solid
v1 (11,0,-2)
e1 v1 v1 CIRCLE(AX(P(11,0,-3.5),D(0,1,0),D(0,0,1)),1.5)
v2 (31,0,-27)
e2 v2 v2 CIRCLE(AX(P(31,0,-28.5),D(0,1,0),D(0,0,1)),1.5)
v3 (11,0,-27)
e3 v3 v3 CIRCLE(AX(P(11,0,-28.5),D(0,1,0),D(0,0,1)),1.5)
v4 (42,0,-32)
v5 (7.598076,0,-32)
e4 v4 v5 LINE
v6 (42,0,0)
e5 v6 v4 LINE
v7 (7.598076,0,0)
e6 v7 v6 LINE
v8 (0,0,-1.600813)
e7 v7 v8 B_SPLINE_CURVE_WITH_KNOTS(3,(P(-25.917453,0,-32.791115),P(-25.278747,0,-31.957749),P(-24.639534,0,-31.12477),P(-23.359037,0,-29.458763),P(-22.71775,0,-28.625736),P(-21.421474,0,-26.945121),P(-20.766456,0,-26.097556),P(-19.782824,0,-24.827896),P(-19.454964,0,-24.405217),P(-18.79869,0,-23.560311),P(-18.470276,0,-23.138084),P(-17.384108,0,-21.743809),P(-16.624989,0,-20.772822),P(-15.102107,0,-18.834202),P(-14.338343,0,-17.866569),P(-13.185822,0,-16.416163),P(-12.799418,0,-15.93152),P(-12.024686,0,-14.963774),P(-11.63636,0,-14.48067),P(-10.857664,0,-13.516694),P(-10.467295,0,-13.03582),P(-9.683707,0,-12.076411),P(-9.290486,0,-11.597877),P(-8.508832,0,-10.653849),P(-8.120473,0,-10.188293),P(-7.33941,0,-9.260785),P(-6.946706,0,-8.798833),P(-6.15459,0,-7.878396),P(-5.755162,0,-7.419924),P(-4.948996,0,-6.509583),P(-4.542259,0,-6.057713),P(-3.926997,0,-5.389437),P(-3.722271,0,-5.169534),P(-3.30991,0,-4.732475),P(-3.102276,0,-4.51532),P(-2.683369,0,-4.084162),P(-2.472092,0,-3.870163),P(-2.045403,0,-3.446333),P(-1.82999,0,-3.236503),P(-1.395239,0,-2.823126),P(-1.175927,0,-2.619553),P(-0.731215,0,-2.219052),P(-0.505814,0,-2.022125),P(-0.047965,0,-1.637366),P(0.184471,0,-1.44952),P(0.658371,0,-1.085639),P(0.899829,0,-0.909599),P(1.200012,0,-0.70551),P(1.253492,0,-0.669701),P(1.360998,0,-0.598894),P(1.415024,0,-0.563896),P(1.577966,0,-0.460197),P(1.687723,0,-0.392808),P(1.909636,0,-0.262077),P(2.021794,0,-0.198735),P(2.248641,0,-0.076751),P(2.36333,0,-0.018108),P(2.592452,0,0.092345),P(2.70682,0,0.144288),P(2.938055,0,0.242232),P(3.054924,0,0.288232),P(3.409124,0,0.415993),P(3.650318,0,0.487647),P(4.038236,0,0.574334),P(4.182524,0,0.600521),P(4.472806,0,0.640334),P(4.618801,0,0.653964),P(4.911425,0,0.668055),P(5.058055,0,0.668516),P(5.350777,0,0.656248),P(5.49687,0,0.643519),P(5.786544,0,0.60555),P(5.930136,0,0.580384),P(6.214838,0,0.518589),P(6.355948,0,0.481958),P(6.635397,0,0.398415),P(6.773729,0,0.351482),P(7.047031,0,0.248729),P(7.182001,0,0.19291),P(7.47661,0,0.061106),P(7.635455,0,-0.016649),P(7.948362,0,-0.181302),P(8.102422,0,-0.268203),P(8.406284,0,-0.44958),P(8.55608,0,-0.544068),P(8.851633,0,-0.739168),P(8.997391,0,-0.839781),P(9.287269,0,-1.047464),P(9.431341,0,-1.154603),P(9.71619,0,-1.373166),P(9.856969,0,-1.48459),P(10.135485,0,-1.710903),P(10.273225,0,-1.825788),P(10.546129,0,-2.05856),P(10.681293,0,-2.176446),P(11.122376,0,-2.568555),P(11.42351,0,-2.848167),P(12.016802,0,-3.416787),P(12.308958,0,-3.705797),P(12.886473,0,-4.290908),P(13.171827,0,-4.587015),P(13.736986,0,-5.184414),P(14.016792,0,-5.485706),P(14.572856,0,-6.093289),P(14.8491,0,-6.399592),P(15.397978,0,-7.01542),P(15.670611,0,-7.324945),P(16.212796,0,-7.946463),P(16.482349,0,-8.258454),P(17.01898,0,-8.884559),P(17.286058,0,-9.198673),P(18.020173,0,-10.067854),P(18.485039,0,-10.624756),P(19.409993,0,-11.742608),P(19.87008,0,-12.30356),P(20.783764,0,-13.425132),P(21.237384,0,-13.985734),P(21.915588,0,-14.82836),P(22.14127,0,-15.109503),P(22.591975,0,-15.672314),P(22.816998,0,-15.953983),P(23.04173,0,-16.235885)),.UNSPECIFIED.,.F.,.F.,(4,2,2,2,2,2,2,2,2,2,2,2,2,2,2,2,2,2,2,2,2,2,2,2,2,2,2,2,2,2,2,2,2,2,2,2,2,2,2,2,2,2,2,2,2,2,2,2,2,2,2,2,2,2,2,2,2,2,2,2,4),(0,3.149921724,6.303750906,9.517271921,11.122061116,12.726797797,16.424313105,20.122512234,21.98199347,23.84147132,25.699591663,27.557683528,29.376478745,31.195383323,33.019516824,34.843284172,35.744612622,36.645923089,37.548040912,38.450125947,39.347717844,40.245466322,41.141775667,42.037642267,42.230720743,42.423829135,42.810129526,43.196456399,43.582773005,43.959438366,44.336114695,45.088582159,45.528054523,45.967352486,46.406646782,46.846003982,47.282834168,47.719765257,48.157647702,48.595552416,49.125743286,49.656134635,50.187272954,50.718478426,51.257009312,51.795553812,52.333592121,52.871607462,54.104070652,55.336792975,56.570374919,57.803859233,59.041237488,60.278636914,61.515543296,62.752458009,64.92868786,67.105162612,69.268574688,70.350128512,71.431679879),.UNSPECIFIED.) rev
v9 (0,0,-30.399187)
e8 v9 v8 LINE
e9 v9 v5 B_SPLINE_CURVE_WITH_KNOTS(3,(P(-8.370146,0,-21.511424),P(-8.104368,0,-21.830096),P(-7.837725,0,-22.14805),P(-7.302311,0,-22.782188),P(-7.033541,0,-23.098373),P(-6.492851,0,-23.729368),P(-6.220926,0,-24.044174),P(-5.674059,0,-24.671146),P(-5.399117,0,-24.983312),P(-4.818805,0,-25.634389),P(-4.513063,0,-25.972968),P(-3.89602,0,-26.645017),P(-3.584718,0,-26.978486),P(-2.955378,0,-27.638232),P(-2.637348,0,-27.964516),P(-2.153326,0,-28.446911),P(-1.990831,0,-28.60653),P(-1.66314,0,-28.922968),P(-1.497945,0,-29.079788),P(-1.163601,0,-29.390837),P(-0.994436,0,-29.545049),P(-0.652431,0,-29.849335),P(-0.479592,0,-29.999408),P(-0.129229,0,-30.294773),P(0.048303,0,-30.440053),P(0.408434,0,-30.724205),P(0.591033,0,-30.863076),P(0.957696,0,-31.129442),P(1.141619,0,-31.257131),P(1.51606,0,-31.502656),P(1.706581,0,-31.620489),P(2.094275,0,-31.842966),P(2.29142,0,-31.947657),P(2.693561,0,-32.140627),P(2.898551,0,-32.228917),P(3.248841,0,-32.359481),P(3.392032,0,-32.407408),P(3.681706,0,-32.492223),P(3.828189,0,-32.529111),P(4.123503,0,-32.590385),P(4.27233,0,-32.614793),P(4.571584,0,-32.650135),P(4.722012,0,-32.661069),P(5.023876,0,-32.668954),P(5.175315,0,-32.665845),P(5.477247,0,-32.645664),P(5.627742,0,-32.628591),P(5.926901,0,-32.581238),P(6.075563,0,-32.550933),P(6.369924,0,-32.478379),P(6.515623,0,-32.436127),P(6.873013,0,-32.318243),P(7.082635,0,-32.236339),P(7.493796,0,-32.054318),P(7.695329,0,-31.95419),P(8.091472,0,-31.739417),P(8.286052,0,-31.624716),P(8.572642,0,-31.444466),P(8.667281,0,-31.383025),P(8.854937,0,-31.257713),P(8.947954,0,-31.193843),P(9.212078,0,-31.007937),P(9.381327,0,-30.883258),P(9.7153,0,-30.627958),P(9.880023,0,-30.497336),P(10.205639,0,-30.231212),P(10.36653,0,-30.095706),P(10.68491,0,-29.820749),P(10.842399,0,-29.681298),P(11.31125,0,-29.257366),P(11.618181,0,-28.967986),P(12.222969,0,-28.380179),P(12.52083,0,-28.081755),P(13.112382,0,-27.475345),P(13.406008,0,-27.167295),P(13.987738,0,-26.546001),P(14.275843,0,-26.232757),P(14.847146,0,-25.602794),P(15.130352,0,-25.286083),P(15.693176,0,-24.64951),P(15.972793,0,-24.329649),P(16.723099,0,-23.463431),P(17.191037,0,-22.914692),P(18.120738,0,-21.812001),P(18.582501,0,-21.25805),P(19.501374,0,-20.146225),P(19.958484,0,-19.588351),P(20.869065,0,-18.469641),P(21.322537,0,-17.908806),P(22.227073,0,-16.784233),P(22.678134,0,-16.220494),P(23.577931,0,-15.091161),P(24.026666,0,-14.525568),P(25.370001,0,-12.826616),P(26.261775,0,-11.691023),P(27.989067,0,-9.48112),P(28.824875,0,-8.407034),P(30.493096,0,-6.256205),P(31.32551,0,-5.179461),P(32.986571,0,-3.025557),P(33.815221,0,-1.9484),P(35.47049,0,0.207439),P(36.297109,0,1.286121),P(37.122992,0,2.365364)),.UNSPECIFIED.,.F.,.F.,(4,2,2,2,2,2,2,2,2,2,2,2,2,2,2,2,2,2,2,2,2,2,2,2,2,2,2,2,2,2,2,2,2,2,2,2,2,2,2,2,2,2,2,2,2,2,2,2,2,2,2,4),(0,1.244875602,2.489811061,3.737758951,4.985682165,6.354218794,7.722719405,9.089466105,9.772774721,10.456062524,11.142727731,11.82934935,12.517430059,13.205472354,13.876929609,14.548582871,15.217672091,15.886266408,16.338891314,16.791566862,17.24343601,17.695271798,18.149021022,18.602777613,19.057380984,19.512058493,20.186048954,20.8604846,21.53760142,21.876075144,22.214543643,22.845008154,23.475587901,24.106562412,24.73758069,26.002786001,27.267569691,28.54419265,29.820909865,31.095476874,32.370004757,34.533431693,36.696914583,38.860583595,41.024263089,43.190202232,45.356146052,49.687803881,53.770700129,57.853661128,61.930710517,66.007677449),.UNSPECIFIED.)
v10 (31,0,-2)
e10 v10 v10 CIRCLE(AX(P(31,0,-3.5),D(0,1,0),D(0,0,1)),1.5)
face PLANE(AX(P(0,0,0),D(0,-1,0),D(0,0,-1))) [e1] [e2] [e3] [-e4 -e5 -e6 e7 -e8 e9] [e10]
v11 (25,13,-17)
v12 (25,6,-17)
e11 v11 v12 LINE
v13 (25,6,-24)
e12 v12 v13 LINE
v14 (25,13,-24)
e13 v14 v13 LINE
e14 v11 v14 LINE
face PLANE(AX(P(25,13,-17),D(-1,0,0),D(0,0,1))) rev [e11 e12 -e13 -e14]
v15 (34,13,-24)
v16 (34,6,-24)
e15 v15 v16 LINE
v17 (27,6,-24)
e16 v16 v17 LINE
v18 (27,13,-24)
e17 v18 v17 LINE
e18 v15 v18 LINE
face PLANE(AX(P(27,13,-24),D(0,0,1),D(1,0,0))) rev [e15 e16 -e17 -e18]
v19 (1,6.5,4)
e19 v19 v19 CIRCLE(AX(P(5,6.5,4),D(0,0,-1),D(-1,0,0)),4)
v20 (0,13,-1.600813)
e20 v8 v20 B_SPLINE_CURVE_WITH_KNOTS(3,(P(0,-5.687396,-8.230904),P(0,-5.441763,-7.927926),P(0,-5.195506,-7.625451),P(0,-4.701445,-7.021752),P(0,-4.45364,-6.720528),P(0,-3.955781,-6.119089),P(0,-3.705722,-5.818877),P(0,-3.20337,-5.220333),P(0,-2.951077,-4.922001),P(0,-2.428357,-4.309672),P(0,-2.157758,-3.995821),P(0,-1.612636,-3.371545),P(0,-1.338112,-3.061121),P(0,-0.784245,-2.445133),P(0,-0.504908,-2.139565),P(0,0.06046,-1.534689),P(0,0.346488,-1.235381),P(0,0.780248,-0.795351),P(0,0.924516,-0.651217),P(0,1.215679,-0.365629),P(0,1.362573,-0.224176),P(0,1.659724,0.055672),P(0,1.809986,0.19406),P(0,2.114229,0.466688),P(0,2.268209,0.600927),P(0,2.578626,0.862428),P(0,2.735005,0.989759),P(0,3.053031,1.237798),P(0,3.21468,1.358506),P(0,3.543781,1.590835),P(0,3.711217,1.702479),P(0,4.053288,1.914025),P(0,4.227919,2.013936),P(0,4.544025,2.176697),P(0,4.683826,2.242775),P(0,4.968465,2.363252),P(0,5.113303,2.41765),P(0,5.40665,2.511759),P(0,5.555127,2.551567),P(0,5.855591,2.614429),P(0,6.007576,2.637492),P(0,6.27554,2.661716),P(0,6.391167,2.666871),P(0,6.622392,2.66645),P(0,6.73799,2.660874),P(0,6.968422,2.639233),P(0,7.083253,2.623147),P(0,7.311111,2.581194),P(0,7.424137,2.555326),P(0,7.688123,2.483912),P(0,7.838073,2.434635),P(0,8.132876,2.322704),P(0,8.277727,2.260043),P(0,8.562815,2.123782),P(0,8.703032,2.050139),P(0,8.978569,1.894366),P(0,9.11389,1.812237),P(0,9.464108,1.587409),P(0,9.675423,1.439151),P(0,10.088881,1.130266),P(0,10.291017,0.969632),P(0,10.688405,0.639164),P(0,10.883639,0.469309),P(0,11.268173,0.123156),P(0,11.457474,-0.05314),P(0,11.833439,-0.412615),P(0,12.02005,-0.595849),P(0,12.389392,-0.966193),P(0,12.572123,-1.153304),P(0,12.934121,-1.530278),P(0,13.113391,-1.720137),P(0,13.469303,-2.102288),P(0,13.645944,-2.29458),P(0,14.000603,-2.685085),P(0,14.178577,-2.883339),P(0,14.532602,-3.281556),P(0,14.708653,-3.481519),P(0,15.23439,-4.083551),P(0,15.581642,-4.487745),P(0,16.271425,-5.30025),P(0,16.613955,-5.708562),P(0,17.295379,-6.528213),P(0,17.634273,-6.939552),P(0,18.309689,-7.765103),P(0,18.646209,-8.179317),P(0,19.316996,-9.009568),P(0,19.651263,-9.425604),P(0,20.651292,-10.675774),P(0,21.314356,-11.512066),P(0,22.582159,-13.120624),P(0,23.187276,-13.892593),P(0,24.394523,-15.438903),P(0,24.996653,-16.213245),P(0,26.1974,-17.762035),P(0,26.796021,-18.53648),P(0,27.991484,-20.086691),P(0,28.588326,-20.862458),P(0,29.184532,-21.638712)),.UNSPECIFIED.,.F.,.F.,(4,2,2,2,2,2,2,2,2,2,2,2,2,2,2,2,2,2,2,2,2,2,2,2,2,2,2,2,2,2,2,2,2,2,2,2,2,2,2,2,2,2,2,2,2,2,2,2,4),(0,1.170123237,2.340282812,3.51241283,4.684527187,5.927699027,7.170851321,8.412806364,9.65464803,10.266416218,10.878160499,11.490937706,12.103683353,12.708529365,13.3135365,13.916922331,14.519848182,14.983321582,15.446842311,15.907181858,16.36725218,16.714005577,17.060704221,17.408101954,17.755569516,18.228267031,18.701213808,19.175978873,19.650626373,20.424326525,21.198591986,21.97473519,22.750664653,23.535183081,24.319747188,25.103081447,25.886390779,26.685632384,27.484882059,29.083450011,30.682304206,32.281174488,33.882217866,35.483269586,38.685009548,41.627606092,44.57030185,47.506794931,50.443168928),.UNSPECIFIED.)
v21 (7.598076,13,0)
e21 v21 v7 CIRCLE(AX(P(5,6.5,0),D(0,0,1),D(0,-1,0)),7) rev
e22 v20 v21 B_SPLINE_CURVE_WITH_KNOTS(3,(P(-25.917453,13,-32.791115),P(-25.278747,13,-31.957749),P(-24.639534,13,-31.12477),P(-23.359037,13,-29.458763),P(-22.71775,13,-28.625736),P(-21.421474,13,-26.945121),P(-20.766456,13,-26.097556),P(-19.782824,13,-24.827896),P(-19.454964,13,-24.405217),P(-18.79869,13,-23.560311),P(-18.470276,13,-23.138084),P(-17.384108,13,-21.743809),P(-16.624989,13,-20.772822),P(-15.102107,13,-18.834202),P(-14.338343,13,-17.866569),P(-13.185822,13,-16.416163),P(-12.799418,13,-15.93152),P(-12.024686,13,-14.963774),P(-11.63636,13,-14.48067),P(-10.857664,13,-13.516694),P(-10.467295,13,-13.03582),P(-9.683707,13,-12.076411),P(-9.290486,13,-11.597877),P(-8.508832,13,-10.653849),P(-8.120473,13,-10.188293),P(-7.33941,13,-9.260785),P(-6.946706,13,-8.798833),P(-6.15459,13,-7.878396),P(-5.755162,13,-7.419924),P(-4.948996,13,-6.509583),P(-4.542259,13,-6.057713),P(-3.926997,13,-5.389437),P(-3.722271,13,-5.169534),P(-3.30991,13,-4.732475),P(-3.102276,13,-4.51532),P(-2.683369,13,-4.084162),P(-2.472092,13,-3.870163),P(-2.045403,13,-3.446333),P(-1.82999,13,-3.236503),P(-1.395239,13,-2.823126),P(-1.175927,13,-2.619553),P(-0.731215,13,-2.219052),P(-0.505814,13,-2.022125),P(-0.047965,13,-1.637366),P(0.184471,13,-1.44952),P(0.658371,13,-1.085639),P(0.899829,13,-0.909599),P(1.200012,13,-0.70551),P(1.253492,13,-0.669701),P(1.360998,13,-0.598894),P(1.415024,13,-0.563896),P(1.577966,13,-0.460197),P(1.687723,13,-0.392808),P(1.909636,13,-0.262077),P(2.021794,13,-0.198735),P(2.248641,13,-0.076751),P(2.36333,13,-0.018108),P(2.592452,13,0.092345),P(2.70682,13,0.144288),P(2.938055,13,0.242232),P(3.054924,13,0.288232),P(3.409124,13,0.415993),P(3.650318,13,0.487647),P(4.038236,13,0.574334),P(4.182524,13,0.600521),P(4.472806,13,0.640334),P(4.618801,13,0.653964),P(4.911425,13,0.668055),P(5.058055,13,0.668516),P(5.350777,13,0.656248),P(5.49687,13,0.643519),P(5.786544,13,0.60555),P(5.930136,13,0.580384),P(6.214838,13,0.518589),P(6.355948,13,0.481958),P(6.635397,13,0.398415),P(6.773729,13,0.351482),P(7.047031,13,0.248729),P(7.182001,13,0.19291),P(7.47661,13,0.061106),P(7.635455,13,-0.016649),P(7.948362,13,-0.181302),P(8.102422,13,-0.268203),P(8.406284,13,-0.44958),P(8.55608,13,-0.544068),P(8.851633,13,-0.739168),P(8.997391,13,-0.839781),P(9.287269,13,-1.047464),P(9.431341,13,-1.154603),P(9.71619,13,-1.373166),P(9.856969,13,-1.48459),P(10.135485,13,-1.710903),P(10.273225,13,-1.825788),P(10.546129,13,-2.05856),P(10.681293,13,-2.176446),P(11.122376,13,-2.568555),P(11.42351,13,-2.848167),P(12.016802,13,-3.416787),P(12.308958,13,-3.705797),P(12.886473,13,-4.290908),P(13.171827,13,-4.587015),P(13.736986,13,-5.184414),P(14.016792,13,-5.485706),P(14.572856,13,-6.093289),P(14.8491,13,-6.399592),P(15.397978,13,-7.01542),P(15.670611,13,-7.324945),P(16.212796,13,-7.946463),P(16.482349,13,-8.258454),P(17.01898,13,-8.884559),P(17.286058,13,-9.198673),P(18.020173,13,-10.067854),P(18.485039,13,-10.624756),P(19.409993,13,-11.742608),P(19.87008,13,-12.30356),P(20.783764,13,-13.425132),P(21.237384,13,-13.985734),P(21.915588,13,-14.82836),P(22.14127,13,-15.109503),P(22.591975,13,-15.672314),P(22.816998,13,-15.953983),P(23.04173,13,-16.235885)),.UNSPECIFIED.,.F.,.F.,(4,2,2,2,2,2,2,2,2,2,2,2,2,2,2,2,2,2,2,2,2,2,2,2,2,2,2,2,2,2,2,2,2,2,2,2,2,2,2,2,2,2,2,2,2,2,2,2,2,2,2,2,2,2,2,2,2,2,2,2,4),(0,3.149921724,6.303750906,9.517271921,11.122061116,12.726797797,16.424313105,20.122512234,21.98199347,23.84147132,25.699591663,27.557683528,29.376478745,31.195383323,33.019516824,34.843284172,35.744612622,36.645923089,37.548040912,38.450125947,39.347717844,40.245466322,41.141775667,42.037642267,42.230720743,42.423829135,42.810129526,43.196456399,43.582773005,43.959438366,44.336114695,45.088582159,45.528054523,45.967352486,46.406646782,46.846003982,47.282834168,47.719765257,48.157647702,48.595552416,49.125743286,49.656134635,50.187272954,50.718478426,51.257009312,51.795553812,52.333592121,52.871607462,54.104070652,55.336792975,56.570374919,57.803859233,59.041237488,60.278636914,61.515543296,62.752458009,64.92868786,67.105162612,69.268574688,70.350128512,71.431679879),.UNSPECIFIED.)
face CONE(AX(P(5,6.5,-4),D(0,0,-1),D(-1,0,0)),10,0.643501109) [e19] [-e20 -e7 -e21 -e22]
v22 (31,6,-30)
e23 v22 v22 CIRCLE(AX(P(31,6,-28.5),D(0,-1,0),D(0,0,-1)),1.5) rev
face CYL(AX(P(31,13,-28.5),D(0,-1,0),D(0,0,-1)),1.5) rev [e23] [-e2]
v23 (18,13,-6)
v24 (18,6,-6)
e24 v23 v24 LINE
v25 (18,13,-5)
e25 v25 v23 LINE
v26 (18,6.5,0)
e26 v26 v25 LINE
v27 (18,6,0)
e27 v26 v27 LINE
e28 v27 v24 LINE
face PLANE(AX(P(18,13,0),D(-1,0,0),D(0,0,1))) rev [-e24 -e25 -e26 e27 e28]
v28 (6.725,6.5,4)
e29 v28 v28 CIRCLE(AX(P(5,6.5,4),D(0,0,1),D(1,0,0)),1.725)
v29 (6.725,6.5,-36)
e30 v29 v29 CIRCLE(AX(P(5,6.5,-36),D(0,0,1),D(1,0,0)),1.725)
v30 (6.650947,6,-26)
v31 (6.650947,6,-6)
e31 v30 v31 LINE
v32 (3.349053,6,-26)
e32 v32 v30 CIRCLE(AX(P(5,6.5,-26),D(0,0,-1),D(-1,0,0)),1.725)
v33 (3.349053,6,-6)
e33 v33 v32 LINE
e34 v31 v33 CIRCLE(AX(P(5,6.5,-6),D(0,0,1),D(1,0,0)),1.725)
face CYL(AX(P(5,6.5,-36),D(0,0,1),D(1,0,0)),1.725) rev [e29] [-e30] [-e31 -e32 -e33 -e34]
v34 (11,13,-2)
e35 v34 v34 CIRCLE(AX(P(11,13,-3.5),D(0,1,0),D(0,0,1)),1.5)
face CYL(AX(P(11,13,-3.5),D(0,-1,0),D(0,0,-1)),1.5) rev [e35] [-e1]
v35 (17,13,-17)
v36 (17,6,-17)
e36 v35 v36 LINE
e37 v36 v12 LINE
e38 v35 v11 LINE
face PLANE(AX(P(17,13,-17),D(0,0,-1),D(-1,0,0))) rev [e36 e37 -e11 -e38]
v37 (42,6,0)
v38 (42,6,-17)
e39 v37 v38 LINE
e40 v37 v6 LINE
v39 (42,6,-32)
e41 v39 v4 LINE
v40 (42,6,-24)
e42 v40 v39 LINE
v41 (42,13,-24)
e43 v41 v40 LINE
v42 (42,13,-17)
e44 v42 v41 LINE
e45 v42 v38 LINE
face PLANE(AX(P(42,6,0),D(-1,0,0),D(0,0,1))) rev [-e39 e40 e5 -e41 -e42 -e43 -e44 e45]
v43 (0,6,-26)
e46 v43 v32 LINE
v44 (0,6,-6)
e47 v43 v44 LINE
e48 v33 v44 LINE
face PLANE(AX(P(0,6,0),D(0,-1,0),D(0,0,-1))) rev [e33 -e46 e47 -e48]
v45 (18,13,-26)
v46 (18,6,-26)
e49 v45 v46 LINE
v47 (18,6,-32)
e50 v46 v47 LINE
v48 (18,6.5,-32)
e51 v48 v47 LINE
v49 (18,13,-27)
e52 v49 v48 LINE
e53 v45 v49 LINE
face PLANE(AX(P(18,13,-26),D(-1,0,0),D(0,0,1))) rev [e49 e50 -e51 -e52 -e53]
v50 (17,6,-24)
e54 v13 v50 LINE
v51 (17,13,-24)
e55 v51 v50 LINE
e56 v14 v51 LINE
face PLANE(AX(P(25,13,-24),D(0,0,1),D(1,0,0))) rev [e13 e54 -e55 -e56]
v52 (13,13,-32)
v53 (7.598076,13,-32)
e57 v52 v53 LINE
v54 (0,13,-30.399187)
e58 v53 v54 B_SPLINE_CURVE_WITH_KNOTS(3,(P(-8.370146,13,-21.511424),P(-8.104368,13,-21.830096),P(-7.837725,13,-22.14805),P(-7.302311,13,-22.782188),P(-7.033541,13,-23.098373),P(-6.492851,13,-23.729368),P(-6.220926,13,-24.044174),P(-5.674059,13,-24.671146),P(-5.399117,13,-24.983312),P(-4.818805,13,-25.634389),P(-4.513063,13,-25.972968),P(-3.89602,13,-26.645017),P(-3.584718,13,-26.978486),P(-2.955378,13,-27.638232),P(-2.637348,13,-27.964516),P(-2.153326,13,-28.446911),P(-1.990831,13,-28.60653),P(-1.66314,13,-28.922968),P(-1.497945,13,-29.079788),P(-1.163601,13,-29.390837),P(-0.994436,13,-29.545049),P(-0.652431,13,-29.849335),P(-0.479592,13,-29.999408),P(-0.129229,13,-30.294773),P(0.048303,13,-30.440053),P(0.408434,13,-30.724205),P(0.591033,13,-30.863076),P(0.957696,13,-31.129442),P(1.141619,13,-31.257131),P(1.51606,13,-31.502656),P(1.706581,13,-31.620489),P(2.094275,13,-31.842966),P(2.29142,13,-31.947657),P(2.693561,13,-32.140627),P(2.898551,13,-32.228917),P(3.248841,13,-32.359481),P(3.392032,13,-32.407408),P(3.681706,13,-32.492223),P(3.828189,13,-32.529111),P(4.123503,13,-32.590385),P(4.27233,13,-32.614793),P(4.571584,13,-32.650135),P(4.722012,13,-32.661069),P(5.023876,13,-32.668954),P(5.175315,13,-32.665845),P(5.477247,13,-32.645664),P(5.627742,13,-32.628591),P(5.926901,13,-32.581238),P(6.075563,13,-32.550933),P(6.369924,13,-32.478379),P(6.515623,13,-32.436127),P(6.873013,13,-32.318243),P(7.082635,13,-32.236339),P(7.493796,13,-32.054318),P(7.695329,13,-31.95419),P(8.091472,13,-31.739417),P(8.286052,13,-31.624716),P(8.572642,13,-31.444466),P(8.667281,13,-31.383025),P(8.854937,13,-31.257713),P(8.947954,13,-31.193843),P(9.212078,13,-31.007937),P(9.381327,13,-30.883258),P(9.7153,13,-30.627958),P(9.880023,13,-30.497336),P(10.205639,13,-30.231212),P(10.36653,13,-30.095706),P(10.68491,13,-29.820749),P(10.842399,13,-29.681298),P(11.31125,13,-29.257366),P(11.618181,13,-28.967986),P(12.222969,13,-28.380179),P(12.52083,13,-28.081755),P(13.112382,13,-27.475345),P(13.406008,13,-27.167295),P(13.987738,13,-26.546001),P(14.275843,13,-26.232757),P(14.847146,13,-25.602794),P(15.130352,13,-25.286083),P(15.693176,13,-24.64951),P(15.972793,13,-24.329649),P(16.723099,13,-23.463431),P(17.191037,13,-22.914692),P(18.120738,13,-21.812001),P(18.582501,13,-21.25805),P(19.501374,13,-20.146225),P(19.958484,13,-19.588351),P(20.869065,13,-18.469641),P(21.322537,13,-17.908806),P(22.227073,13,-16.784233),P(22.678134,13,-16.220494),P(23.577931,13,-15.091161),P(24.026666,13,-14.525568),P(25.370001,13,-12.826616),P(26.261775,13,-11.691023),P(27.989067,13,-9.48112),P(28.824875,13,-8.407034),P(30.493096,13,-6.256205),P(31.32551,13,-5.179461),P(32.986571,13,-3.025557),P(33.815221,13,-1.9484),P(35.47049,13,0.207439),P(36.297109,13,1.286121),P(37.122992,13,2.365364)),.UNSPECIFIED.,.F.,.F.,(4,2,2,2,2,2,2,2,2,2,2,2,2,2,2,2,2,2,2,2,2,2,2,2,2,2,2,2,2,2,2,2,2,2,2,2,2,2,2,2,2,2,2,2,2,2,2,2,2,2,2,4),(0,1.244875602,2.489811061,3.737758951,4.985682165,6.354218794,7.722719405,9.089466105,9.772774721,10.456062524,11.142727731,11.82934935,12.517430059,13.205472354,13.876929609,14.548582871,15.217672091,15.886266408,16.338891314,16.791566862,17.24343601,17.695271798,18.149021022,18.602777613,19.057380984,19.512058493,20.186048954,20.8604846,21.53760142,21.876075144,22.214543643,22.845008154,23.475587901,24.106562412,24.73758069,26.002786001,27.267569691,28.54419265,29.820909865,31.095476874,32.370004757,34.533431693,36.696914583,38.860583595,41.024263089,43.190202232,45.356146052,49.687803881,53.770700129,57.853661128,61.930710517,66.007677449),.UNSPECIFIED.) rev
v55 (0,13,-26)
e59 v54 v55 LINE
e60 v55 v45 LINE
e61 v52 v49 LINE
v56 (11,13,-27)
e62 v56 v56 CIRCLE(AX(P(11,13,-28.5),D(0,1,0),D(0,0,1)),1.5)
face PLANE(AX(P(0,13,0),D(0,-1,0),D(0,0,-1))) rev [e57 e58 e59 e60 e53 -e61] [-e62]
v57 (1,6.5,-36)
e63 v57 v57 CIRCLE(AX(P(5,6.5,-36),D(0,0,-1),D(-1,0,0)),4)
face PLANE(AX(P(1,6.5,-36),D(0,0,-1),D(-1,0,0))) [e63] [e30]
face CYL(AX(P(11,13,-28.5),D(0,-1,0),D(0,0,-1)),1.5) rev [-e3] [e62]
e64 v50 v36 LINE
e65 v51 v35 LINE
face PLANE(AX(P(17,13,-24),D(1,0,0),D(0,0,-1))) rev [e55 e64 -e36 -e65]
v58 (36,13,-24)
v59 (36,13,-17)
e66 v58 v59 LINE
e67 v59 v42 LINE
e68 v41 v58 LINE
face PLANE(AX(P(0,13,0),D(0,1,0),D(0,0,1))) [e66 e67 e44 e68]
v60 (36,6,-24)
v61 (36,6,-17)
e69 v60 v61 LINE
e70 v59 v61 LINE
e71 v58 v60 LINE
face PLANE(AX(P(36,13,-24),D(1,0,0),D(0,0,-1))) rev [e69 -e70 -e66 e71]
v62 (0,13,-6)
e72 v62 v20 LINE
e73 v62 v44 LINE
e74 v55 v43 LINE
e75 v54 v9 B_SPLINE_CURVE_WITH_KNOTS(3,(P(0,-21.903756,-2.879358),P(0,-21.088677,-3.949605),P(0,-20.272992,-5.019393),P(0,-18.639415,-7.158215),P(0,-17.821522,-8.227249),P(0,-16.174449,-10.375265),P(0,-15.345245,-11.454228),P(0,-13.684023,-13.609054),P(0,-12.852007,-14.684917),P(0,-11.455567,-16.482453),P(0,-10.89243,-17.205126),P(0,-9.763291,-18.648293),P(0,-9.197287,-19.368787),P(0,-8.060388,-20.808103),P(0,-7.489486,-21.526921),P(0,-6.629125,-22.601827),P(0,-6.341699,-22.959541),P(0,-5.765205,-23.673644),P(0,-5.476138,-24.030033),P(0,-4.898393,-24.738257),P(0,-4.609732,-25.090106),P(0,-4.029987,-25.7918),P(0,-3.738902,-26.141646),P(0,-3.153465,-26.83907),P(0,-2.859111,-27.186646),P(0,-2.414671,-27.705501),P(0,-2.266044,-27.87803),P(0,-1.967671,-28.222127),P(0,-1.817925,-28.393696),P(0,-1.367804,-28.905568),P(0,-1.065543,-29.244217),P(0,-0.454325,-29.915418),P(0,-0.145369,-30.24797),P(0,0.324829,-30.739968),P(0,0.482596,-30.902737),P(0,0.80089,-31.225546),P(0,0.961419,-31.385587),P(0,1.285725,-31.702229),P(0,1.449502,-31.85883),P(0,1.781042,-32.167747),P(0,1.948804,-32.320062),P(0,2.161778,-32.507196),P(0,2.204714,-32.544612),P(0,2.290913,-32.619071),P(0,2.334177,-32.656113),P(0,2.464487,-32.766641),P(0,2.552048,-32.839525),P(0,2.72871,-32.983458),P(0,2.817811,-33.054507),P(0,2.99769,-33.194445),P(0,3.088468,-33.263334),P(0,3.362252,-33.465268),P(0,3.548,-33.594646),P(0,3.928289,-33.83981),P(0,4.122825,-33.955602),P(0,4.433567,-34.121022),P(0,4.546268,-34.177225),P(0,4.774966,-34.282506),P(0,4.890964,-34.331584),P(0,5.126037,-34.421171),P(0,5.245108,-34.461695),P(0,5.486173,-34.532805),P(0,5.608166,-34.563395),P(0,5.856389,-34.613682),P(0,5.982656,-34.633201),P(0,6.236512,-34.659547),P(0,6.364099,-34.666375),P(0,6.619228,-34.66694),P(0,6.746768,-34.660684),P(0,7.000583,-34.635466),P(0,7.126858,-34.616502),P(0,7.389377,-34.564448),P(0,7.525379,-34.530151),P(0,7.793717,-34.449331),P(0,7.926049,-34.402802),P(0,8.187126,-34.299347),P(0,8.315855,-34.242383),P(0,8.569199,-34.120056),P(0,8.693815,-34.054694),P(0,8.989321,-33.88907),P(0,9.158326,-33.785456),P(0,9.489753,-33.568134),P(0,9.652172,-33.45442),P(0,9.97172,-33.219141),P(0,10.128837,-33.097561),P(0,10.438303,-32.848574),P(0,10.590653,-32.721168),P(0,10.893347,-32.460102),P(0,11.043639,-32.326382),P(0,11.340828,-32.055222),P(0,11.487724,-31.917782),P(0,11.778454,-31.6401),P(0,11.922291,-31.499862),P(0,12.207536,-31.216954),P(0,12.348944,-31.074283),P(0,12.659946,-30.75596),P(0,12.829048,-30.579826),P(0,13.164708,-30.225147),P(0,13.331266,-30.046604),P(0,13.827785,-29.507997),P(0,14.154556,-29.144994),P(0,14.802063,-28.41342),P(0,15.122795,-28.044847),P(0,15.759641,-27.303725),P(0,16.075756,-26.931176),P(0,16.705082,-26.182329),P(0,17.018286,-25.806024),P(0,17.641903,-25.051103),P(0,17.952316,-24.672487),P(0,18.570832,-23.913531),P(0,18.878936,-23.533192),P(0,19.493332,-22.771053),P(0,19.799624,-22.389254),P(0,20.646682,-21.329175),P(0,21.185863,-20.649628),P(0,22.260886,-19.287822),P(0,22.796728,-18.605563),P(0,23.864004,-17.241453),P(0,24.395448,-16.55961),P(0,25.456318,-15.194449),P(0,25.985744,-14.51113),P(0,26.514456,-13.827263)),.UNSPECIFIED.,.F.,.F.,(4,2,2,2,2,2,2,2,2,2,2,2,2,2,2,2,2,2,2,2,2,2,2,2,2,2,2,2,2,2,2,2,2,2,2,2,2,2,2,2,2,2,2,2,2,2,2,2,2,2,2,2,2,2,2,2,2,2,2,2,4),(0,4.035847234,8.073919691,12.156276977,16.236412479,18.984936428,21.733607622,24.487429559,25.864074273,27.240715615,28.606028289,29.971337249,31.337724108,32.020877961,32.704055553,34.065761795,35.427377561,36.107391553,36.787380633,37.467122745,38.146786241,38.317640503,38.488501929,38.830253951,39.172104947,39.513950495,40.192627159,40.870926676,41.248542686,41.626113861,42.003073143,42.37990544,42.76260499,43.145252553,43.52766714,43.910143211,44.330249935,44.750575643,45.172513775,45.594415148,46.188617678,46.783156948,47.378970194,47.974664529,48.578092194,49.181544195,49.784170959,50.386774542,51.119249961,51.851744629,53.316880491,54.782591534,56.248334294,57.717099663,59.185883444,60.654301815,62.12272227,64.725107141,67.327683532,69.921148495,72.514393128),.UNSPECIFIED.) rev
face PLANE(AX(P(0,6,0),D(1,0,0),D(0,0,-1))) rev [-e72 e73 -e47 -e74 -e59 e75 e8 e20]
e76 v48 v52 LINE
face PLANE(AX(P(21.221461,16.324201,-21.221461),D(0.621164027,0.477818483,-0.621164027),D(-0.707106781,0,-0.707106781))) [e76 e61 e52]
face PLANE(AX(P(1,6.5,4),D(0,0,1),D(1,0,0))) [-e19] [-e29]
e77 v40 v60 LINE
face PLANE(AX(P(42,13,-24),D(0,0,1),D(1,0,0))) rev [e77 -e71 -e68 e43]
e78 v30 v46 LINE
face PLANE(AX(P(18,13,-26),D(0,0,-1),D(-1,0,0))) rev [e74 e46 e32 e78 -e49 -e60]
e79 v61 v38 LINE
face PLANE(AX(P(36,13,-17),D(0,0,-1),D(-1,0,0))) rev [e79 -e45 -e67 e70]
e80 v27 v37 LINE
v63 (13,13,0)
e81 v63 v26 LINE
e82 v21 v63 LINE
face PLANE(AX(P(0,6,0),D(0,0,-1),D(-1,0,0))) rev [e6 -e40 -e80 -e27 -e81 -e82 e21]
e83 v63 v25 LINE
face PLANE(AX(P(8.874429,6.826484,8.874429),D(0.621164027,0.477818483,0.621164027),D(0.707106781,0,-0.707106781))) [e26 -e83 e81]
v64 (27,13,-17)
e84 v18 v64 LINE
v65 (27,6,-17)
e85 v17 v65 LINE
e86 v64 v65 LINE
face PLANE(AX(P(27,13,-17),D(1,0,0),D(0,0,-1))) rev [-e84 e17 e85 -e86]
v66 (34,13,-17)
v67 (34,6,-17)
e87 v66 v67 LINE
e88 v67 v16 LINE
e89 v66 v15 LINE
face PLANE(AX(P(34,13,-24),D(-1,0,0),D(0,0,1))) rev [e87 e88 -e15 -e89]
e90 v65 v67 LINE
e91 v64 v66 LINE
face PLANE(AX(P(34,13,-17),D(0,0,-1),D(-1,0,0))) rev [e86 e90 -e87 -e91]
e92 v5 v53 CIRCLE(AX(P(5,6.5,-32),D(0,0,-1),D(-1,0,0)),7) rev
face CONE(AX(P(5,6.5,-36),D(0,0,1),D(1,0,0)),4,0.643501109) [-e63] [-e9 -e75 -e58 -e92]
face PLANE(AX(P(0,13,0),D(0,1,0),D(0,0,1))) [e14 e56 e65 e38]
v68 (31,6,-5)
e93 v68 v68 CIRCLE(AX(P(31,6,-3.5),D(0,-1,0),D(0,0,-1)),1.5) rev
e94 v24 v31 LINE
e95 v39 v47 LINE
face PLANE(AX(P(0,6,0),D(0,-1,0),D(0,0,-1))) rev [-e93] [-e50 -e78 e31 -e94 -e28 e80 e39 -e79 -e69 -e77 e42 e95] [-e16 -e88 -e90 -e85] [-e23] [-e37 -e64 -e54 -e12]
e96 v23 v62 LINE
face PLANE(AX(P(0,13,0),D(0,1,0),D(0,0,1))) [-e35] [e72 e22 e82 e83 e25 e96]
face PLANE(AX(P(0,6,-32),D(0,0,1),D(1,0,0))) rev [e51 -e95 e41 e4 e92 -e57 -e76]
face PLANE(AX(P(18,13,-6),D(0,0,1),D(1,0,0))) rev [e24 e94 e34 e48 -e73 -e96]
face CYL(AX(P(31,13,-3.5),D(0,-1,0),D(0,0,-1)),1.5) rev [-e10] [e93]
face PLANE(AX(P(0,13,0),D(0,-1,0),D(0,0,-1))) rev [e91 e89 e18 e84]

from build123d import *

# Parameters (mm, degrees)
SKETCH1_W           = 42
SKETCH1_H           = 32
BOSS_EXTRUDE1_DEPTH = 6
SKETCH4_W           = 18
SKETCH4_H           = 6
SKETCH4_W_2         = 7
SKETCH4_H_2         = 7
SKETCH4_W_3         = 6
SKETCH4_W_4         = 8
BOSS_EXTRUDE2_DEPTH = 7
SKETCH9_R           = 1.725
CUT_EXTRUDE2_DEPTH  = 61.301326685
SKETCH10_W          = 6
SKETCH10_H          = 13
BOSS_EXTRUDE5_DEPTH = 11
SKETCH5_R           = 1.5
CUT_EXTRUDE3_DEPTH  = 57.824290581
CHAMFER1_START      = 14.286772629
CHAMFER1_DEPTH      = 3.105820136
CHAMFER2_START      = -5.671483031
CHAMFER2_DEPTH      = 11.890532792


with BuildPart() as part:
    # Sketch1 → Boss-Extrude1 (new body)
    with BuildSketch(Plane(origin=(0, 0, 0), x_dir=(1, 0, 0), z_dir=(0, 1, 0))):
        with Locations((21, 16)):
            Rectangle(SKETCH1_W, SKETCH1_H)
    extrude(amount=BOSS_EXTRUDE1_DEPTH)

    # Sketch3 → Revolve2 (revolve)
    with BuildSketch(Plane(origin=(0, 6.5, 0), x_dir=(1, 0, 0), z_dir=(0, 1, 0)), mode=Mode.PRIVATE) as revolve2_sk:
        Polygon((5, 28), (-5, 28), (1, 36), (5, 36), align=None)
        Polygon((5, -4), (5, 4), (-5, 4), (1, -4), align=None)
    revolve(revolve2_sk.sketch.rotate(Axis((5, 6.5, -28), (0, 0, 1)), 177.134016017), axis=Axis((5, 6.5, -28), (0, 0, 1)))

    # Sketch4 → Boss-Extrude2 (add)
    with BuildSketch(Plane(origin=(0, 6, 0), x_dir=(1, 0, 0), z_dir=(0, 1, 0))):
        with Locations((9, 29)):
            Rectangle(SKETCH4_W, SKETCH4_H)
        with Locations((30.5, 20.5)):
            Rectangle(SKETCH4_W_2, SKETCH4_H_2)
        with Locations((39, 20.5)):
            Rectangle(SKETCH4_W_3, SKETCH4_H_2)
        with Locations((21, 20.5)):
            Rectangle(SKETCH4_W_4, SKETCH4_H_2)
        with Locations((9, 3)):
            Rectangle(SKETCH4_W, SKETCH4_H)
    extrude(amount=BOSS_EXTRUDE2_DEPTH)

    # Sketch7 → Cut-Revolve1 (revolve, cut)
    with BuildSketch(Plane(origin=(0, 6.5, 0), x_dir=(1, 0, 0), z_dir=(0, 1, 0))):
        Polygon((-5, 4), (1, -4), (-5, -4), align=None)
        Polygon((-5, 28), (1, 36), (-5, 36), align=None)
    revolve(axis=Axis((5, 6.5, -36), (0, 0, 1)), mode=Mode.SUBTRACT)

    # Sketch9 → Cut-Extrude2 (cut, through all)
    with BuildSketch(Plane.XY.offset(4)):
        with Locations((5, 6.5)):
            Circle(SKETCH9_R)
        Polygon((18, 13), (0, 13), (0, 0), (18, 0), (18, -5), (-7, -5), (-7, 18), (18, 18), align=None)
    extrude(amount=-CUT_EXTRUDE2_DEPTH, mode=Mode.SUBTRACT)

    # Sketch10 → Boss-Extrude5 (add)
    with BuildSketch(Plane(origin=(18, 0, 0), x_dir=(0, 0, -1), z_dir=(1, 0, 0))):
        with Locations((3, 6.5)):
            Rectangle(SKETCH10_W, SKETCH10_H)
        with Locations((29, 6.5)):
            Rectangle(SKETCH10_W, SKETCH10_H)
    extrude(amount=-BOSS_EXTRUDE5_DEPTH)

    # Sketch5 → Cut-Extrude3 (cut, through all)
    with BuildSketch(Plane(origin=(0, 0, 0), x_dir=(1, 0, 0), z_dir=(0, 1, 0))):
        with Locations(Location((11, 28.5, 0), (0, 0, 270))):
            Circle(SKETCH5_R)
        with Locations(Location((31, 28.5, 0), (0, 0, 90))):
            Circle(SKETCH5_R)
        with Locations(Location((31, 3.5, 0), (0, 0, 90))):
            Circle(SKETCH5_R)
        with Locations(Location((11, 3.5, 0), (0, 0, 270))):
            Circle(SKETCH5_R)
    extrude(amount=CUT_EXTRUDE3_DEPTH, mode=Mode.SUBTRACT)

    # Chamfer1: read off the stored shape, not the designer's step
    # Chamfer1 outline → Chamfer1 (cut)
    with BuildSketch(Plane(origin=(0, 0, 0), x_dir=(0.7836805797909963, -0.3787303917205566, -0.49234950923672277), z_dir=(0.6211640273377459, 0.4778184825674969, 0.6211640273377449)).offset(CHAMFER1_START)):
        Polygon((11.64450289, 5.152055929), (11.64450289, 13.352665663), (5.264352445, 10.304111858), align=None)
    extrude(amount=CHAMFER1_DEPTH, mode=Mode.SUBTRACT)

    # Chamfer2: read off the stored shape, not the designer's step
    # Chamfer2 outline → Chamfer2 (cut)
    with BuildSketch(Plane(origin=(0, 0, 0), x_dir=(0.7926239891045996, 0.6097107608496931, 0), z_dir=(0.6097107608496931, -0.7926239891045995, 0)).offset(CHAMFER2_START)):
        Polygon((22.193471695, -27), (18.230351749, -32), (24, -32), (24, -25), (23.778719673, -25), align=None)
    extrude(amount=CHAMFER2_DEPTH, mode=Mode.SUBTRACT)


solid = part.part
